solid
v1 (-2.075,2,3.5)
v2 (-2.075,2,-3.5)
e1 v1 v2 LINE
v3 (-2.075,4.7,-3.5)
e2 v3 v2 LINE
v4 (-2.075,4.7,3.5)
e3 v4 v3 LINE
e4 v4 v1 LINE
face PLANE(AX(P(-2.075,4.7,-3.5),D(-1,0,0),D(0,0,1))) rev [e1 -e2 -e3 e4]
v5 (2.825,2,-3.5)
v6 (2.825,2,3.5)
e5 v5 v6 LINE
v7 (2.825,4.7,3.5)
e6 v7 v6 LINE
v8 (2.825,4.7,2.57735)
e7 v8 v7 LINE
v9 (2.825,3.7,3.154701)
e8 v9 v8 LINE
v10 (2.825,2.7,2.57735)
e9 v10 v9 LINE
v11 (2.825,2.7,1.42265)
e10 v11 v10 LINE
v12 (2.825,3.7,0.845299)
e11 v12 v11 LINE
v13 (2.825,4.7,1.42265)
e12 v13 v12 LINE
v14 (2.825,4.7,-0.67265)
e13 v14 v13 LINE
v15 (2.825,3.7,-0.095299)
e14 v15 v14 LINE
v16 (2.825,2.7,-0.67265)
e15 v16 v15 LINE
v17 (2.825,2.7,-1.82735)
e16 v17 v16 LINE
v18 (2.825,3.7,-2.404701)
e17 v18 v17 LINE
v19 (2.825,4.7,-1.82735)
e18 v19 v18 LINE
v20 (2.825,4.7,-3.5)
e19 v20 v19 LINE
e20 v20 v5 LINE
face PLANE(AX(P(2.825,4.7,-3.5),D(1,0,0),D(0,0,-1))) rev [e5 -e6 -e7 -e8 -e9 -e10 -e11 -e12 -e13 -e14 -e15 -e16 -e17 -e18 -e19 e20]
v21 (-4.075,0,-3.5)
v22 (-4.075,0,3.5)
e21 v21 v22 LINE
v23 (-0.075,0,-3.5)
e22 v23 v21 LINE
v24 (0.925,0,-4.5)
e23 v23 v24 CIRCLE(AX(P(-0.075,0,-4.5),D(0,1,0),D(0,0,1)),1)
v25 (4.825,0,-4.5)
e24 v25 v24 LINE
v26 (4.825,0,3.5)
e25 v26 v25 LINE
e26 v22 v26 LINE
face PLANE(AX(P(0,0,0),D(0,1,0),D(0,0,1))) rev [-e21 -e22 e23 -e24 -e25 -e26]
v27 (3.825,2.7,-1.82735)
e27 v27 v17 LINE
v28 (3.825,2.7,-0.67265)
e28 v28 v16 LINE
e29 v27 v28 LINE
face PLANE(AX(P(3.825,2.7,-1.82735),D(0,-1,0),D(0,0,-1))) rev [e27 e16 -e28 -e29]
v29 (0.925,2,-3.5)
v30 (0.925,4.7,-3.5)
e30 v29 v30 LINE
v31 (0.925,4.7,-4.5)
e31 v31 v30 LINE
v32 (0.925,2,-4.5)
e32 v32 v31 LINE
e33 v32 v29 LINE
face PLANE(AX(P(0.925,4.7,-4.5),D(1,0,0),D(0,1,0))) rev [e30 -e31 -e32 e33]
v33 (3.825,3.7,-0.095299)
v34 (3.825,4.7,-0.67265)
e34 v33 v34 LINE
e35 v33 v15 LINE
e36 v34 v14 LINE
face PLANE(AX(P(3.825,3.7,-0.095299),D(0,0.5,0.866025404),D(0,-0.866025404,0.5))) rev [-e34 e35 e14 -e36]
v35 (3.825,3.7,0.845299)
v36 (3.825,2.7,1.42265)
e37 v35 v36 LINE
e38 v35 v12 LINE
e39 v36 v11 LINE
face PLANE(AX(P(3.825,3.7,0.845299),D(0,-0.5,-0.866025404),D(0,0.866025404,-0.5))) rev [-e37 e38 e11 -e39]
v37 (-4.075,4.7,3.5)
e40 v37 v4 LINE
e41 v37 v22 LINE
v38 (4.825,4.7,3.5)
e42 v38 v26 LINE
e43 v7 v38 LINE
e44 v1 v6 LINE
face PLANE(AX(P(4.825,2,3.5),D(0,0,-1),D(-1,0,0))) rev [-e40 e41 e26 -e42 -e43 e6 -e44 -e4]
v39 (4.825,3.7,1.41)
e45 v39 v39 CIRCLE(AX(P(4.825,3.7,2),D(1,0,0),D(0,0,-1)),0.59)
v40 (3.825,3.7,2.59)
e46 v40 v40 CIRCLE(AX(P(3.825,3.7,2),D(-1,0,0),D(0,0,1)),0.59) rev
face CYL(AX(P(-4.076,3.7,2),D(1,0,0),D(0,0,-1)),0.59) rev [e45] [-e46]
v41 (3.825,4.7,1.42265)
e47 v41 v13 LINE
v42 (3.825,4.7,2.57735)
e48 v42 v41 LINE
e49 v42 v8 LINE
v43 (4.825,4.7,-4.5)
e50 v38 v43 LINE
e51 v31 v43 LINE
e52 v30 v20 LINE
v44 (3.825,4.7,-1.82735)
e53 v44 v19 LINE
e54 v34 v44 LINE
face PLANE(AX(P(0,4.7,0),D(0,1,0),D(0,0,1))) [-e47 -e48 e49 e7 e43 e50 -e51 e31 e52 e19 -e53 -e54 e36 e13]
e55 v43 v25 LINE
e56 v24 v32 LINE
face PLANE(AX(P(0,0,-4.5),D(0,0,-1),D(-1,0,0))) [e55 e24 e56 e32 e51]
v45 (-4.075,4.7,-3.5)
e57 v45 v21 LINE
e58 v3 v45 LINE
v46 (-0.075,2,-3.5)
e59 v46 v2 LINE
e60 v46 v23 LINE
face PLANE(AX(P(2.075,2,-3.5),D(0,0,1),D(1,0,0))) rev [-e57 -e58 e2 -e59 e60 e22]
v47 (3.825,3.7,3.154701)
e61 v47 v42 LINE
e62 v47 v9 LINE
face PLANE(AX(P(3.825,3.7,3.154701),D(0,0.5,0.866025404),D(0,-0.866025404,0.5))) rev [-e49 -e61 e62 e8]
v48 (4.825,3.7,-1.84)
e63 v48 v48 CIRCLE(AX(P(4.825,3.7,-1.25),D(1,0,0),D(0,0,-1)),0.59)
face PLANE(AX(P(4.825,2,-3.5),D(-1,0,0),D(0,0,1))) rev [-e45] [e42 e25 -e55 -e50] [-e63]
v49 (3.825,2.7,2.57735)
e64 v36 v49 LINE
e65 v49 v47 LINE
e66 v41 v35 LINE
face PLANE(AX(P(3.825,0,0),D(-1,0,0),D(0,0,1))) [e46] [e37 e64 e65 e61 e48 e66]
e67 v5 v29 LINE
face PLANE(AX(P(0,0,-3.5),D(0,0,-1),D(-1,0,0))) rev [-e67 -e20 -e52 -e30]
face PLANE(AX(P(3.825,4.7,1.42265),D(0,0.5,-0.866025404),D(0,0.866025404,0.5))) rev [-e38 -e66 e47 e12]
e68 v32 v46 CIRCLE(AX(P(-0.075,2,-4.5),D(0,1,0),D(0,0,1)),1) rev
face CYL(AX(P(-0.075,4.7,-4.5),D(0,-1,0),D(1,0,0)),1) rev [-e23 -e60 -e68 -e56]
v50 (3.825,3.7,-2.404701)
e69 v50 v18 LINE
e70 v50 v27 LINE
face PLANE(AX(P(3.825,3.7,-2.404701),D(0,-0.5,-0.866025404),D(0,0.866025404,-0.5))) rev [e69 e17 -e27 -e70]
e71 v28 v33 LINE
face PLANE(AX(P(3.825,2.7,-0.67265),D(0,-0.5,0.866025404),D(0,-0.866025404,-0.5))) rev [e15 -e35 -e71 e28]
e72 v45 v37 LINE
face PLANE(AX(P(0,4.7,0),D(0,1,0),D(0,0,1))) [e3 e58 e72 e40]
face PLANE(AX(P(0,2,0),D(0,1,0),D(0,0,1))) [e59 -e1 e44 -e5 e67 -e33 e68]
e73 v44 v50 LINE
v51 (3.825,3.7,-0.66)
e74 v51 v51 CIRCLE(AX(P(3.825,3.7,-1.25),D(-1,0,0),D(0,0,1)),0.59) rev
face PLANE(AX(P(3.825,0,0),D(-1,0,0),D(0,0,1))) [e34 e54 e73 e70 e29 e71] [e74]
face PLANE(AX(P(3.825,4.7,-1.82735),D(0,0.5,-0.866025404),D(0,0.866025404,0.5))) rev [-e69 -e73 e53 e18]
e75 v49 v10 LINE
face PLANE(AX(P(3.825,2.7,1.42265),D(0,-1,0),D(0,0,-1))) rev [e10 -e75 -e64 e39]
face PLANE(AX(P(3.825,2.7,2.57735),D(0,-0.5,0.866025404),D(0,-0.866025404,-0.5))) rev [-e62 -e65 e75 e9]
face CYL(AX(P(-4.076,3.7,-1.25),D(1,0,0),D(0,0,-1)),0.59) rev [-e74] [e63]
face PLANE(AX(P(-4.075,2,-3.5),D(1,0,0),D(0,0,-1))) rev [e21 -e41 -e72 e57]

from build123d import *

# Parameters (mm, degrees)
BOSS_EXTRUDE1_DEPTH = 2
SKETCH2_W           = 2
SKETCH2_H           = 7
BOSS_EXTRUDE2_DEPTH = 2.7
CUT_EXTRUDE1_DEPTH  = 1
CUT_EXTRUDE2_REACH  = 12.656
SKETCH4_R           = 0.59
SKETCH5_W           = 3.9
SKETCH5_H           = 4.7
BOSS_EXTRUDE3_DEPTH = 1
FILLET1_R           = 1


with BuildPart() as part:
    # Sketch1 → Boss-Extrude1 (new body)
    with BuildSketch(Plane(origin=(0, 0, 0), x_dir=(1, 0, 0), z_dir=(0, 1, 0))):
        Polygon((2.075, -3.5), (2.825, -3.5), (3.825, -3.5), (4.825, -3.5), (4.825, 3.5), (3.825, 3.5), (2.825, 3.5), (2.075, 3.5), (-2.075, 3.5), (-4.075, 3.5), (-4.075, -3.5), (-2.075, -3.5), align=None)
    extrude(amount=BOSS_EXTRUDE1_DEPTH)

    # Sketch2 → Boss-Extrude2 (add)
    with BuildSketch(Plane(origin=(0, 2, 0), x_dir=(1, 0, 0), z_dir=(0, 1, 0))):
        with Locations((-3.075, 0)):
            Rectangle(SKETCH2_W, SKETCH2_H)
        with Locations((3.825, 0)):
            Rectangle(SKETCH2_W, SKETCH2_H)
    extrude(amount=BOSS_EXTRUDE2_DEPTH)

    # Sketch3 → Cut-Extrude1 (cut)
    with BuildSketch(Plane.ZY.offset(-2.825)):
        Polygon((-0.095299462, 3.7), (-0.672649731, 4.7), (-1.827350269, 4.7), (-2.404700538, 3.7), (-1.827350269, 2.7), (-0.672649731, 2.7), align=None)
        Polygon((3.154700538, 3.7), (2.577350269, 4.7), (1.422649731, 4.7), (0.845299462, 3.7), (1.422649731, 2.7), (2.577350269, 2.7), align=None)
    extrude(amount=-CUT_EXTRUDE1_DEPTH, mode=Mode.SUBTRACT)

    # Sketch4 → Cut-Extrude2 (cut, up to next)
    with BuildSketch(Plane(origin=(4.825, 0, 0), x_dir=(0, 0, -1), z_dir=(1, 0, 0)), mode=Mode.PRIVATE) as cut_extrude2_sk1:
        with Locations((-2, 3.7)):
            Circle(SKETCH4_R)
    cut_extrude2_tool1 = extrude(cut_extrude2_sk1.sketch, amount=-CUT_EXTRUDE2_REACH, mode=Mode.PRIVATE) & part.part
    # Sketch4 → Cut-Extrude2 (cut, up to next)
    with BuildSketch(Plane(origin=(4.825, 0, 0), x_dir=(0, 0, -1), z_dir=(1, 0, 0)), mode=Mode.PRIVATE) as cut_extrude2_sk2:
        with Locations((1.25, 3.7)):
            Circle(SKETCH4_R)
    cut_extrude2_tool2 = extrude(cut_extrude2_sk2.sketch, amount=-CUT_EXTRUDE2_REACH, mode=Mode.PRIVATE) & part.part
    add(cut_extrude2_tool1.solids().sort_by_distance((4.825, 3.7, 2))[0], mode=Mode.SUBTRACT)
    add(cut_extrude2_tool2.solids().sort_by_distance((4.825, 3.7, -1.25))[0], mode=Mode.SUBTRACT)

    # Sketch5 → Boss-Extrude3 (add)
    with BuildSketch(Plane(origin=(0, 0, -3.5), x_dir=(-1, 0, 0), z_dir=(0, 0, -1))):
        with Locations((-2.875, 2.35)):
            Rectangle(SKETCH5_W, SKETCH5_H)
    extrude(amount=BOSS_EXTRUDE3_DEPTH)

    # Fillet1
    fillet1_edges = [part.edges().sort_by_distance(p)[0] for p in [
        (0.925, 1, -3.5),
    ]]
    fillet(fillet1_edges, radius=FILLET1_R - 0.0001)  # a hair under: the kernel refuses the full size


solid = part.part
